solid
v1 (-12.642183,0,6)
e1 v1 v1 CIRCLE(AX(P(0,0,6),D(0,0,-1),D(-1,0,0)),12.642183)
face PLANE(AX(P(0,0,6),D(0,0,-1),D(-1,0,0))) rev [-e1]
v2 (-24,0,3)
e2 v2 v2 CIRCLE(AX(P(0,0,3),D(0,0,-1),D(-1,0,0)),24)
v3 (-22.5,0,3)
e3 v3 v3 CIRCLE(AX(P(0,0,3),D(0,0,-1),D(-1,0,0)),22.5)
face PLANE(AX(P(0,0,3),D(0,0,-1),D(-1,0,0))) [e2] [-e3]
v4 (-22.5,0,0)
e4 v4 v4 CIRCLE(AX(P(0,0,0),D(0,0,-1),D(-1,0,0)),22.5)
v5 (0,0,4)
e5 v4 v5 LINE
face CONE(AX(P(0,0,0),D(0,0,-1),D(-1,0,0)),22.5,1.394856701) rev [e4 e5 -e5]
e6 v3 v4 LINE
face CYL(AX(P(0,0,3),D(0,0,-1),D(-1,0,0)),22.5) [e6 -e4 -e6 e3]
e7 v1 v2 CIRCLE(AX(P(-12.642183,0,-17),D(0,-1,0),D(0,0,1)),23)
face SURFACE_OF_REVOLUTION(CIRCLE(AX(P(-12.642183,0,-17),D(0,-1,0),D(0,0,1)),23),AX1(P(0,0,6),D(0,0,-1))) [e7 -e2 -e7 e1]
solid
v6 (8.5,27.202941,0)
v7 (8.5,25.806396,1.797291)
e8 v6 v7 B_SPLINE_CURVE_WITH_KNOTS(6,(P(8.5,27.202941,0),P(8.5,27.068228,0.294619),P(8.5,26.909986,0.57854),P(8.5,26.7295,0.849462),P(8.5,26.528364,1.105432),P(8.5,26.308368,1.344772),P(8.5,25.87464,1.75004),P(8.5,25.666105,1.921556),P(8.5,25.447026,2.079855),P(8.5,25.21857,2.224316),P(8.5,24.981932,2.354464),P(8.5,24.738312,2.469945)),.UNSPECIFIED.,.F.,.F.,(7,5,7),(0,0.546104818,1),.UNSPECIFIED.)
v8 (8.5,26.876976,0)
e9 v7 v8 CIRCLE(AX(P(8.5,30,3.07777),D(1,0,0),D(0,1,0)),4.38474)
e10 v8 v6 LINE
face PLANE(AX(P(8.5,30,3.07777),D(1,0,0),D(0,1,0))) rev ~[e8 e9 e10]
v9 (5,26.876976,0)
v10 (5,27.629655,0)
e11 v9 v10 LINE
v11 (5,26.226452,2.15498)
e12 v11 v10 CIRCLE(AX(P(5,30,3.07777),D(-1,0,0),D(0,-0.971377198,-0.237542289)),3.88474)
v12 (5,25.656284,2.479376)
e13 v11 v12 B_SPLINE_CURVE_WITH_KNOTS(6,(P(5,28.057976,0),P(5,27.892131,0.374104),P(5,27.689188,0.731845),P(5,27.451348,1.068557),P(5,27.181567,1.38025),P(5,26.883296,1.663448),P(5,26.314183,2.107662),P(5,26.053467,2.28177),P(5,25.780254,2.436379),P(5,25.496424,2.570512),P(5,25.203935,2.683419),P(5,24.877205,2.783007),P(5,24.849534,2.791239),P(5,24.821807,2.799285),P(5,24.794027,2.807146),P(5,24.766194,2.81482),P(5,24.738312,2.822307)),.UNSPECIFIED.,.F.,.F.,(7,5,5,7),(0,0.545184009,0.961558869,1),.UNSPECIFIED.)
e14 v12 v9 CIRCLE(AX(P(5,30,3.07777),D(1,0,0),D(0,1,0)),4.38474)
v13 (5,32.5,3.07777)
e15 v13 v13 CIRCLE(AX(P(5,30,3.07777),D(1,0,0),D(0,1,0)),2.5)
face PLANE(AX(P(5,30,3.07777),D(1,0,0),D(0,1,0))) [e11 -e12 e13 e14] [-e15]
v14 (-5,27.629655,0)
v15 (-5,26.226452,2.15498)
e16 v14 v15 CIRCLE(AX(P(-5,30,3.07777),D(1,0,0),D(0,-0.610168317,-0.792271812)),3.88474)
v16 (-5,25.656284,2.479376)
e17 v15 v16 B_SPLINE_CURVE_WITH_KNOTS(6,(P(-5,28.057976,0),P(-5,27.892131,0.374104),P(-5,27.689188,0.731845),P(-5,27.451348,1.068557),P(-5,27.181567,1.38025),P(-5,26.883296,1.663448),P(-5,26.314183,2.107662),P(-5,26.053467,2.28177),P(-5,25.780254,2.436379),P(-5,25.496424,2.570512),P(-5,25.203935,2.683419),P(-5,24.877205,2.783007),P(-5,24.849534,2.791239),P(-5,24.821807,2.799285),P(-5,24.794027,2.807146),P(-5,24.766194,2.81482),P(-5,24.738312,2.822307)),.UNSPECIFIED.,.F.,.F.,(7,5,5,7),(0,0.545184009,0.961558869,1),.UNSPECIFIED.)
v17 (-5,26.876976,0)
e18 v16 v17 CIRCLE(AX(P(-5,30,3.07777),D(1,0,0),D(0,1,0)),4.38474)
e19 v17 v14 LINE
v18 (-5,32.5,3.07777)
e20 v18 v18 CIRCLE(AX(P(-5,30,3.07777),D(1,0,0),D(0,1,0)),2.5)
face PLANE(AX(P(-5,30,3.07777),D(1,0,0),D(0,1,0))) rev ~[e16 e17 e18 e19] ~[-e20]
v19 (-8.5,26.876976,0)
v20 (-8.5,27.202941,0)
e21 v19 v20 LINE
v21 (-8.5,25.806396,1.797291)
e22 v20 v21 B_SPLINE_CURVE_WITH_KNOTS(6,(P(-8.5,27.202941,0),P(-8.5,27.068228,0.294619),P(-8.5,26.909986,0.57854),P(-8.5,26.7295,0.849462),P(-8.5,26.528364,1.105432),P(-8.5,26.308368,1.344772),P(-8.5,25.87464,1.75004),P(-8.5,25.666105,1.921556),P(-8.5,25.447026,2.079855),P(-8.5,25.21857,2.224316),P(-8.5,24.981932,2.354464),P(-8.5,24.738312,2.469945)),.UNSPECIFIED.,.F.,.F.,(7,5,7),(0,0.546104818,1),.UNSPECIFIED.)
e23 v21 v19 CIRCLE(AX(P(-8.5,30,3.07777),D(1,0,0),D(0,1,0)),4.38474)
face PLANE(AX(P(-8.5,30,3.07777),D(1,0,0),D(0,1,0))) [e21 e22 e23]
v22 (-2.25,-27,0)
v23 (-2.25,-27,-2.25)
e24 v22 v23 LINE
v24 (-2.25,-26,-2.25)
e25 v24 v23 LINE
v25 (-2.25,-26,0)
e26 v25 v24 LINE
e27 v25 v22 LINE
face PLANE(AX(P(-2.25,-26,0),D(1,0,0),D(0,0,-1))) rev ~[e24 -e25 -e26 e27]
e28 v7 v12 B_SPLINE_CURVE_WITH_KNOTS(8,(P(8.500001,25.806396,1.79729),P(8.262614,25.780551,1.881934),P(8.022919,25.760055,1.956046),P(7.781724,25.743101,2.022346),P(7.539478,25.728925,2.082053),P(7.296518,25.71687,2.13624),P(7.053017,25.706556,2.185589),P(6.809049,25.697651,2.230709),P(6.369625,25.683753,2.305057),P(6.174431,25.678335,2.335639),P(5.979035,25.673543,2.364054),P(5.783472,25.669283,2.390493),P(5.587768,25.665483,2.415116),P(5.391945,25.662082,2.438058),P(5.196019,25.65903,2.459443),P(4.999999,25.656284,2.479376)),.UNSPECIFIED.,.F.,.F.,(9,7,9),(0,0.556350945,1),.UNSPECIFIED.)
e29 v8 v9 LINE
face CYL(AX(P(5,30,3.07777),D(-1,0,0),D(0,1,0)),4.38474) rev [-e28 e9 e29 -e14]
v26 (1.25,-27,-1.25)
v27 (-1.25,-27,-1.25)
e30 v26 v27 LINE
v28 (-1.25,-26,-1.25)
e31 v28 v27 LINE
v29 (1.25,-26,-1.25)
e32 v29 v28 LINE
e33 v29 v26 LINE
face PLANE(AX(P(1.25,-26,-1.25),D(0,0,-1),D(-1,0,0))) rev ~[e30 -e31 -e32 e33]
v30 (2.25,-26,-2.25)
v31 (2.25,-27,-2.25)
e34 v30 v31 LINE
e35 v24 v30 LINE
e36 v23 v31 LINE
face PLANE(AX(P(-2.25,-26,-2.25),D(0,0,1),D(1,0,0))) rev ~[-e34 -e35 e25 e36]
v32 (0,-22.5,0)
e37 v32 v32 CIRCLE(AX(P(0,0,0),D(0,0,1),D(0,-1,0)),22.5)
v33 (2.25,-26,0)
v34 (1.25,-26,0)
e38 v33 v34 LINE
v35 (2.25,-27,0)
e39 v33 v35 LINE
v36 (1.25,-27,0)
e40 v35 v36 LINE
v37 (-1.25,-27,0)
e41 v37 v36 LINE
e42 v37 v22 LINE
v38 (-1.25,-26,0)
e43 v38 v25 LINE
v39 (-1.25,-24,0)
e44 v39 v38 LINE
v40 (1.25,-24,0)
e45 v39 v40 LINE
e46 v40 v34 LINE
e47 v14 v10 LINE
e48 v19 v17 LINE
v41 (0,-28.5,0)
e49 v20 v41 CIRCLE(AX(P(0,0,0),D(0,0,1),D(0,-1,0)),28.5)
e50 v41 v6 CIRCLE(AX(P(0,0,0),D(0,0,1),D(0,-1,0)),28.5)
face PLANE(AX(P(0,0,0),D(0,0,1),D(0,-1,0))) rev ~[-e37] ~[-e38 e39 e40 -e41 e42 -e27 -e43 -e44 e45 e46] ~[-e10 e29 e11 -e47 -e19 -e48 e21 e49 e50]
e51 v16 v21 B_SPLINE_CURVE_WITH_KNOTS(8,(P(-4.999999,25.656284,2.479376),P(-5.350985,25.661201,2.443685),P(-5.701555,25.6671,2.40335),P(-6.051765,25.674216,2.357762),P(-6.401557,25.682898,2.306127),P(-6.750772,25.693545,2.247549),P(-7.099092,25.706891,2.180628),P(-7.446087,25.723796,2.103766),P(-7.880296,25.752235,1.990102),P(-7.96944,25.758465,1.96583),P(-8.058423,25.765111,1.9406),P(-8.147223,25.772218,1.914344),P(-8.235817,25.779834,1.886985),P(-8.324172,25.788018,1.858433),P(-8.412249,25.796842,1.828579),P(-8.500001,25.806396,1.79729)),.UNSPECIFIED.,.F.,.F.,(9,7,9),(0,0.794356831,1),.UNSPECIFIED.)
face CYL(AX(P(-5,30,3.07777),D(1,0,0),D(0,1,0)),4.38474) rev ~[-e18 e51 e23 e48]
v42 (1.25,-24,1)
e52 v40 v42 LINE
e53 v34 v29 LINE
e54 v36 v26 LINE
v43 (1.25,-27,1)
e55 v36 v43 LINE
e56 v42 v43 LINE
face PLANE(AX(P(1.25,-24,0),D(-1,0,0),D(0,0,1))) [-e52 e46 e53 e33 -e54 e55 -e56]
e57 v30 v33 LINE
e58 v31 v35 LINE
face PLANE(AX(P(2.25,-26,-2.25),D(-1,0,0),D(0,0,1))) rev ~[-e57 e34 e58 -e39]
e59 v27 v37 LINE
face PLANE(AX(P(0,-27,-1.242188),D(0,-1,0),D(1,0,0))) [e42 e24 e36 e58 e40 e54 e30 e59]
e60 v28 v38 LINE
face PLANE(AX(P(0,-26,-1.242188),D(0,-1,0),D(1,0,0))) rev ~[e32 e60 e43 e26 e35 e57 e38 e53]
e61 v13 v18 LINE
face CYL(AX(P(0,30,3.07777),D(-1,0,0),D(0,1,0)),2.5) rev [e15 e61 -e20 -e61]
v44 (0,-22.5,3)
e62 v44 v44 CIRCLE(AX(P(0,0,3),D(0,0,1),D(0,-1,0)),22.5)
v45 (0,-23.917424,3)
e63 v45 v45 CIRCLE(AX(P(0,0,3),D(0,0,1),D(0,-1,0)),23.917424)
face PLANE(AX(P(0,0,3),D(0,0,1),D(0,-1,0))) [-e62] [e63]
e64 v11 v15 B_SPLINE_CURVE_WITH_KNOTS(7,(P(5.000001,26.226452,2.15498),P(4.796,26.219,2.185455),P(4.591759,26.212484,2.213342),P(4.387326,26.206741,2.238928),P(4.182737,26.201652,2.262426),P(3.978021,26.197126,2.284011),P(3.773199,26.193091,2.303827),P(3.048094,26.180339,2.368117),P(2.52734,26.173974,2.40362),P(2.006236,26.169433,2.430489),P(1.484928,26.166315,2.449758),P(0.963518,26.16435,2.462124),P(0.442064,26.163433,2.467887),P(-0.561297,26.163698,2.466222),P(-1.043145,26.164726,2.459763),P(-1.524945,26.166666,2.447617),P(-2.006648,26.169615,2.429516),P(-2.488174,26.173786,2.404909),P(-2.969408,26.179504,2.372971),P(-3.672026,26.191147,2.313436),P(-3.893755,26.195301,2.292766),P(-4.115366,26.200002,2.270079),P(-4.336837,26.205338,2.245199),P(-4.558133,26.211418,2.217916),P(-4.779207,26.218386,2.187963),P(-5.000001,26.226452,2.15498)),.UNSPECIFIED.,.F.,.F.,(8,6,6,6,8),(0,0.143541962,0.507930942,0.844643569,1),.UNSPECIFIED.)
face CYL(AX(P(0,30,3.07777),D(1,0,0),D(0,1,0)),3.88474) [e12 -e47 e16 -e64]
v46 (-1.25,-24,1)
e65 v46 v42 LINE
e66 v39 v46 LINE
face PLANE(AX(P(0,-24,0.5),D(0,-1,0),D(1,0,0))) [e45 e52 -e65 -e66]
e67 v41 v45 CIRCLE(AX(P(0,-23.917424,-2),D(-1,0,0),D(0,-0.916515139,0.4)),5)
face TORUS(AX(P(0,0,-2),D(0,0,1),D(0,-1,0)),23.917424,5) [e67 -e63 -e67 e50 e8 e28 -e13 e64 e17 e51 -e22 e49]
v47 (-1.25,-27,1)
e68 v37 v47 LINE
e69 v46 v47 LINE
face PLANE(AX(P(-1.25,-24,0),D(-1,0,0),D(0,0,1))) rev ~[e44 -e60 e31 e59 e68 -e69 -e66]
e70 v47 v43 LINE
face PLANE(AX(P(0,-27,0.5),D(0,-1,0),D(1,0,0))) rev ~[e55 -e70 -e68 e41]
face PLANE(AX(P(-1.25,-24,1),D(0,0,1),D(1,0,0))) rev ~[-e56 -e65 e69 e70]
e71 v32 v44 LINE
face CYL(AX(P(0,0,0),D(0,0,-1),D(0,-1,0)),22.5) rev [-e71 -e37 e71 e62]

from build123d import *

# Parameters (mm, degrees)
F0_R      = 28.5
F0_R_2    = 22.5
F1_DEPTH  = 3
F3_ANGLE  = -90
F4_W      = 1.5
F4_H      = 3
F7_START  = 26
F7_DEPTH  = 1
F8_R      = 3.88474
F8_R_2    = 2.5
F9_DEPTH  = 5
F10_START = -5
F8_R_3    = 4.38474
F10_DEPTH = 3.5
F11_START = 5
F11_DEPTH = 3.5
F12_START = 24
F4_W_2    = 2.5
F4_H_2    = 1
F12_DEPTH = 3


# Not quite as in the source:
# - a fillet or chamfer that OpenCascade refuses, or shapes differently, is made with other operations: its cross-section is extruded or revolved along the edge and cut away or added


with BuildPart() as f1:
    # F0 (on Top) → F1 (new body)
    with BuildSketch(Plane.XY):
        Circle(F0_R)
        Circle(F0_R_2, mode=Mode.SUBTRACT)
    extrude(amount=F1_DEPTH)

    # F2: fillet of radius 5 on 1 edges, made by hand

    # F2_s1 → F2_t2 (revolve, cut)
    with BuildSketch(Plane.XZ):
        with BuildLine():
            ThreePointArc((28.5, 0), (26.6560370926, 2.1833001327), (23.917424305, 3))
            Line((23.917424305, 3), (28.5, 3))
            Line((28.5, 3), (28.5, 0))
        make_face()
    revolve(axis=Axis((0, 0, 3), (0, 0, 1)), mode=Mode.SUBTRACT)


with BuildPart() as f1_1:
    # F3: moved
    add(f1.part.rotate(Axis((0, 0, -1.9999999998), (0, 0, 1)), F3_ANGLE))

    # F4 (on Front) → F7 (join)
    with BuildSketch(Plane.XZ.offset(F7_START)):
        Polygon((1.25, -1.25), (-1.25, -1.25), (-1.25, 0), (-2.25, 0), (-2.25, -2.25), (2.25, -2.25), (2.25, 0), (1.25, 0), align=None)
    extrude(amount=F7_DEPTH)

    # F8 (on Right) → F9 (join, symmetric)
    with BuildSketch(Plane.YZ):
        with Locations((30, 3.07777)):
            Circle(F8_R)
        with Locations((30, 3.07777)):
            Circle(F8_R_2, mode=Mode.SUBTRACT)
    extrude(amount=F9_DEPTH, both=True)

    # F8 (on Right) → F10 (cut)
    with BuildSketch(Plane.YZ.offset(F10_START)):
        with Locations((30, 3.07777)):
            Circle(F8_R_3)
        with Locations((30, 3.07777)):
            Circle(F8_R, mode=Mode.SUBTRACT)
        with Locations((30, 3.07777)):
            Circle(F8_R)
        with Locations((30, 3.07777)):
            Circle(F8_R_2, mode=Mode.SUBTRACT)
    extrude(amount=-F10_DEPTH, mode=Mode.SUBTRACT)

    # F8 (on Right) → F11 (cut)
    with BuildSketch(Plane.YZ.offset(F11_START)):
        with Locations((30, 3.07777)):
            Circle(F8_R_3)
        with Locations((30, 3.07777)):
            Circle(F8_R, mode=Mode.SUBTRACT)
        with Locations((30, 3.07777)):
            Circle(F8_R)
        with Locations((30, 3.07777)):
            Circle(F8_R_2, mode=Mode.SUBTRACT)
    extrude(amount=F11_DEPTH, mode=Mode.SUBTRACT)

    # F4 (on Front) → F12 (cut)
    with BuildSketch(Plane.XZ.offset(F12_START)):
        with Locations((0, 0.5)):
            Rectangle(F4_W_2, F4_H_2)
    extrude(amount=F12_DEPTH, mode=Mode.SUBTRACT)


with BuildPart() as f5:
    # F4 (on Front) → F5 (revolve)
    with BuildSketch(Plane.XZ):
        Polygon((0, 4), (0, 6), (-22.5, 6), (-22.5, 3), align=None)
        with Locations((-23.25, 4.5)):
            Rectangle(F4_W, F4_H)
        Polygon((-22.5, 0), (0, 4), (-22.5, 3), align=None)
    revolve(axis=Axis((0, 0, 5), (0, 0, -1)))

    # F6: fillet of radius 23 on 1 edges, made by hand

    # F6_s1 → F6_t2 (revolve, cut)
    with BuildSketch(Plane.XZ):
        with BuildLine():
            ThreePointArc((-12.6421833084, 6), (-18.5158533706, 5.2373559579), (-24, 3))
            Line((-24, 3), (-24, 6))
            Line((-24, 6), (-12.6421833084, 6))
        make_face()
    revolve(axis=Axis((0, 0, 6), (0, 0, -1)), mode=Mode.SUBTRACT)


solid = Compound([f1_1.part, f5.part])
